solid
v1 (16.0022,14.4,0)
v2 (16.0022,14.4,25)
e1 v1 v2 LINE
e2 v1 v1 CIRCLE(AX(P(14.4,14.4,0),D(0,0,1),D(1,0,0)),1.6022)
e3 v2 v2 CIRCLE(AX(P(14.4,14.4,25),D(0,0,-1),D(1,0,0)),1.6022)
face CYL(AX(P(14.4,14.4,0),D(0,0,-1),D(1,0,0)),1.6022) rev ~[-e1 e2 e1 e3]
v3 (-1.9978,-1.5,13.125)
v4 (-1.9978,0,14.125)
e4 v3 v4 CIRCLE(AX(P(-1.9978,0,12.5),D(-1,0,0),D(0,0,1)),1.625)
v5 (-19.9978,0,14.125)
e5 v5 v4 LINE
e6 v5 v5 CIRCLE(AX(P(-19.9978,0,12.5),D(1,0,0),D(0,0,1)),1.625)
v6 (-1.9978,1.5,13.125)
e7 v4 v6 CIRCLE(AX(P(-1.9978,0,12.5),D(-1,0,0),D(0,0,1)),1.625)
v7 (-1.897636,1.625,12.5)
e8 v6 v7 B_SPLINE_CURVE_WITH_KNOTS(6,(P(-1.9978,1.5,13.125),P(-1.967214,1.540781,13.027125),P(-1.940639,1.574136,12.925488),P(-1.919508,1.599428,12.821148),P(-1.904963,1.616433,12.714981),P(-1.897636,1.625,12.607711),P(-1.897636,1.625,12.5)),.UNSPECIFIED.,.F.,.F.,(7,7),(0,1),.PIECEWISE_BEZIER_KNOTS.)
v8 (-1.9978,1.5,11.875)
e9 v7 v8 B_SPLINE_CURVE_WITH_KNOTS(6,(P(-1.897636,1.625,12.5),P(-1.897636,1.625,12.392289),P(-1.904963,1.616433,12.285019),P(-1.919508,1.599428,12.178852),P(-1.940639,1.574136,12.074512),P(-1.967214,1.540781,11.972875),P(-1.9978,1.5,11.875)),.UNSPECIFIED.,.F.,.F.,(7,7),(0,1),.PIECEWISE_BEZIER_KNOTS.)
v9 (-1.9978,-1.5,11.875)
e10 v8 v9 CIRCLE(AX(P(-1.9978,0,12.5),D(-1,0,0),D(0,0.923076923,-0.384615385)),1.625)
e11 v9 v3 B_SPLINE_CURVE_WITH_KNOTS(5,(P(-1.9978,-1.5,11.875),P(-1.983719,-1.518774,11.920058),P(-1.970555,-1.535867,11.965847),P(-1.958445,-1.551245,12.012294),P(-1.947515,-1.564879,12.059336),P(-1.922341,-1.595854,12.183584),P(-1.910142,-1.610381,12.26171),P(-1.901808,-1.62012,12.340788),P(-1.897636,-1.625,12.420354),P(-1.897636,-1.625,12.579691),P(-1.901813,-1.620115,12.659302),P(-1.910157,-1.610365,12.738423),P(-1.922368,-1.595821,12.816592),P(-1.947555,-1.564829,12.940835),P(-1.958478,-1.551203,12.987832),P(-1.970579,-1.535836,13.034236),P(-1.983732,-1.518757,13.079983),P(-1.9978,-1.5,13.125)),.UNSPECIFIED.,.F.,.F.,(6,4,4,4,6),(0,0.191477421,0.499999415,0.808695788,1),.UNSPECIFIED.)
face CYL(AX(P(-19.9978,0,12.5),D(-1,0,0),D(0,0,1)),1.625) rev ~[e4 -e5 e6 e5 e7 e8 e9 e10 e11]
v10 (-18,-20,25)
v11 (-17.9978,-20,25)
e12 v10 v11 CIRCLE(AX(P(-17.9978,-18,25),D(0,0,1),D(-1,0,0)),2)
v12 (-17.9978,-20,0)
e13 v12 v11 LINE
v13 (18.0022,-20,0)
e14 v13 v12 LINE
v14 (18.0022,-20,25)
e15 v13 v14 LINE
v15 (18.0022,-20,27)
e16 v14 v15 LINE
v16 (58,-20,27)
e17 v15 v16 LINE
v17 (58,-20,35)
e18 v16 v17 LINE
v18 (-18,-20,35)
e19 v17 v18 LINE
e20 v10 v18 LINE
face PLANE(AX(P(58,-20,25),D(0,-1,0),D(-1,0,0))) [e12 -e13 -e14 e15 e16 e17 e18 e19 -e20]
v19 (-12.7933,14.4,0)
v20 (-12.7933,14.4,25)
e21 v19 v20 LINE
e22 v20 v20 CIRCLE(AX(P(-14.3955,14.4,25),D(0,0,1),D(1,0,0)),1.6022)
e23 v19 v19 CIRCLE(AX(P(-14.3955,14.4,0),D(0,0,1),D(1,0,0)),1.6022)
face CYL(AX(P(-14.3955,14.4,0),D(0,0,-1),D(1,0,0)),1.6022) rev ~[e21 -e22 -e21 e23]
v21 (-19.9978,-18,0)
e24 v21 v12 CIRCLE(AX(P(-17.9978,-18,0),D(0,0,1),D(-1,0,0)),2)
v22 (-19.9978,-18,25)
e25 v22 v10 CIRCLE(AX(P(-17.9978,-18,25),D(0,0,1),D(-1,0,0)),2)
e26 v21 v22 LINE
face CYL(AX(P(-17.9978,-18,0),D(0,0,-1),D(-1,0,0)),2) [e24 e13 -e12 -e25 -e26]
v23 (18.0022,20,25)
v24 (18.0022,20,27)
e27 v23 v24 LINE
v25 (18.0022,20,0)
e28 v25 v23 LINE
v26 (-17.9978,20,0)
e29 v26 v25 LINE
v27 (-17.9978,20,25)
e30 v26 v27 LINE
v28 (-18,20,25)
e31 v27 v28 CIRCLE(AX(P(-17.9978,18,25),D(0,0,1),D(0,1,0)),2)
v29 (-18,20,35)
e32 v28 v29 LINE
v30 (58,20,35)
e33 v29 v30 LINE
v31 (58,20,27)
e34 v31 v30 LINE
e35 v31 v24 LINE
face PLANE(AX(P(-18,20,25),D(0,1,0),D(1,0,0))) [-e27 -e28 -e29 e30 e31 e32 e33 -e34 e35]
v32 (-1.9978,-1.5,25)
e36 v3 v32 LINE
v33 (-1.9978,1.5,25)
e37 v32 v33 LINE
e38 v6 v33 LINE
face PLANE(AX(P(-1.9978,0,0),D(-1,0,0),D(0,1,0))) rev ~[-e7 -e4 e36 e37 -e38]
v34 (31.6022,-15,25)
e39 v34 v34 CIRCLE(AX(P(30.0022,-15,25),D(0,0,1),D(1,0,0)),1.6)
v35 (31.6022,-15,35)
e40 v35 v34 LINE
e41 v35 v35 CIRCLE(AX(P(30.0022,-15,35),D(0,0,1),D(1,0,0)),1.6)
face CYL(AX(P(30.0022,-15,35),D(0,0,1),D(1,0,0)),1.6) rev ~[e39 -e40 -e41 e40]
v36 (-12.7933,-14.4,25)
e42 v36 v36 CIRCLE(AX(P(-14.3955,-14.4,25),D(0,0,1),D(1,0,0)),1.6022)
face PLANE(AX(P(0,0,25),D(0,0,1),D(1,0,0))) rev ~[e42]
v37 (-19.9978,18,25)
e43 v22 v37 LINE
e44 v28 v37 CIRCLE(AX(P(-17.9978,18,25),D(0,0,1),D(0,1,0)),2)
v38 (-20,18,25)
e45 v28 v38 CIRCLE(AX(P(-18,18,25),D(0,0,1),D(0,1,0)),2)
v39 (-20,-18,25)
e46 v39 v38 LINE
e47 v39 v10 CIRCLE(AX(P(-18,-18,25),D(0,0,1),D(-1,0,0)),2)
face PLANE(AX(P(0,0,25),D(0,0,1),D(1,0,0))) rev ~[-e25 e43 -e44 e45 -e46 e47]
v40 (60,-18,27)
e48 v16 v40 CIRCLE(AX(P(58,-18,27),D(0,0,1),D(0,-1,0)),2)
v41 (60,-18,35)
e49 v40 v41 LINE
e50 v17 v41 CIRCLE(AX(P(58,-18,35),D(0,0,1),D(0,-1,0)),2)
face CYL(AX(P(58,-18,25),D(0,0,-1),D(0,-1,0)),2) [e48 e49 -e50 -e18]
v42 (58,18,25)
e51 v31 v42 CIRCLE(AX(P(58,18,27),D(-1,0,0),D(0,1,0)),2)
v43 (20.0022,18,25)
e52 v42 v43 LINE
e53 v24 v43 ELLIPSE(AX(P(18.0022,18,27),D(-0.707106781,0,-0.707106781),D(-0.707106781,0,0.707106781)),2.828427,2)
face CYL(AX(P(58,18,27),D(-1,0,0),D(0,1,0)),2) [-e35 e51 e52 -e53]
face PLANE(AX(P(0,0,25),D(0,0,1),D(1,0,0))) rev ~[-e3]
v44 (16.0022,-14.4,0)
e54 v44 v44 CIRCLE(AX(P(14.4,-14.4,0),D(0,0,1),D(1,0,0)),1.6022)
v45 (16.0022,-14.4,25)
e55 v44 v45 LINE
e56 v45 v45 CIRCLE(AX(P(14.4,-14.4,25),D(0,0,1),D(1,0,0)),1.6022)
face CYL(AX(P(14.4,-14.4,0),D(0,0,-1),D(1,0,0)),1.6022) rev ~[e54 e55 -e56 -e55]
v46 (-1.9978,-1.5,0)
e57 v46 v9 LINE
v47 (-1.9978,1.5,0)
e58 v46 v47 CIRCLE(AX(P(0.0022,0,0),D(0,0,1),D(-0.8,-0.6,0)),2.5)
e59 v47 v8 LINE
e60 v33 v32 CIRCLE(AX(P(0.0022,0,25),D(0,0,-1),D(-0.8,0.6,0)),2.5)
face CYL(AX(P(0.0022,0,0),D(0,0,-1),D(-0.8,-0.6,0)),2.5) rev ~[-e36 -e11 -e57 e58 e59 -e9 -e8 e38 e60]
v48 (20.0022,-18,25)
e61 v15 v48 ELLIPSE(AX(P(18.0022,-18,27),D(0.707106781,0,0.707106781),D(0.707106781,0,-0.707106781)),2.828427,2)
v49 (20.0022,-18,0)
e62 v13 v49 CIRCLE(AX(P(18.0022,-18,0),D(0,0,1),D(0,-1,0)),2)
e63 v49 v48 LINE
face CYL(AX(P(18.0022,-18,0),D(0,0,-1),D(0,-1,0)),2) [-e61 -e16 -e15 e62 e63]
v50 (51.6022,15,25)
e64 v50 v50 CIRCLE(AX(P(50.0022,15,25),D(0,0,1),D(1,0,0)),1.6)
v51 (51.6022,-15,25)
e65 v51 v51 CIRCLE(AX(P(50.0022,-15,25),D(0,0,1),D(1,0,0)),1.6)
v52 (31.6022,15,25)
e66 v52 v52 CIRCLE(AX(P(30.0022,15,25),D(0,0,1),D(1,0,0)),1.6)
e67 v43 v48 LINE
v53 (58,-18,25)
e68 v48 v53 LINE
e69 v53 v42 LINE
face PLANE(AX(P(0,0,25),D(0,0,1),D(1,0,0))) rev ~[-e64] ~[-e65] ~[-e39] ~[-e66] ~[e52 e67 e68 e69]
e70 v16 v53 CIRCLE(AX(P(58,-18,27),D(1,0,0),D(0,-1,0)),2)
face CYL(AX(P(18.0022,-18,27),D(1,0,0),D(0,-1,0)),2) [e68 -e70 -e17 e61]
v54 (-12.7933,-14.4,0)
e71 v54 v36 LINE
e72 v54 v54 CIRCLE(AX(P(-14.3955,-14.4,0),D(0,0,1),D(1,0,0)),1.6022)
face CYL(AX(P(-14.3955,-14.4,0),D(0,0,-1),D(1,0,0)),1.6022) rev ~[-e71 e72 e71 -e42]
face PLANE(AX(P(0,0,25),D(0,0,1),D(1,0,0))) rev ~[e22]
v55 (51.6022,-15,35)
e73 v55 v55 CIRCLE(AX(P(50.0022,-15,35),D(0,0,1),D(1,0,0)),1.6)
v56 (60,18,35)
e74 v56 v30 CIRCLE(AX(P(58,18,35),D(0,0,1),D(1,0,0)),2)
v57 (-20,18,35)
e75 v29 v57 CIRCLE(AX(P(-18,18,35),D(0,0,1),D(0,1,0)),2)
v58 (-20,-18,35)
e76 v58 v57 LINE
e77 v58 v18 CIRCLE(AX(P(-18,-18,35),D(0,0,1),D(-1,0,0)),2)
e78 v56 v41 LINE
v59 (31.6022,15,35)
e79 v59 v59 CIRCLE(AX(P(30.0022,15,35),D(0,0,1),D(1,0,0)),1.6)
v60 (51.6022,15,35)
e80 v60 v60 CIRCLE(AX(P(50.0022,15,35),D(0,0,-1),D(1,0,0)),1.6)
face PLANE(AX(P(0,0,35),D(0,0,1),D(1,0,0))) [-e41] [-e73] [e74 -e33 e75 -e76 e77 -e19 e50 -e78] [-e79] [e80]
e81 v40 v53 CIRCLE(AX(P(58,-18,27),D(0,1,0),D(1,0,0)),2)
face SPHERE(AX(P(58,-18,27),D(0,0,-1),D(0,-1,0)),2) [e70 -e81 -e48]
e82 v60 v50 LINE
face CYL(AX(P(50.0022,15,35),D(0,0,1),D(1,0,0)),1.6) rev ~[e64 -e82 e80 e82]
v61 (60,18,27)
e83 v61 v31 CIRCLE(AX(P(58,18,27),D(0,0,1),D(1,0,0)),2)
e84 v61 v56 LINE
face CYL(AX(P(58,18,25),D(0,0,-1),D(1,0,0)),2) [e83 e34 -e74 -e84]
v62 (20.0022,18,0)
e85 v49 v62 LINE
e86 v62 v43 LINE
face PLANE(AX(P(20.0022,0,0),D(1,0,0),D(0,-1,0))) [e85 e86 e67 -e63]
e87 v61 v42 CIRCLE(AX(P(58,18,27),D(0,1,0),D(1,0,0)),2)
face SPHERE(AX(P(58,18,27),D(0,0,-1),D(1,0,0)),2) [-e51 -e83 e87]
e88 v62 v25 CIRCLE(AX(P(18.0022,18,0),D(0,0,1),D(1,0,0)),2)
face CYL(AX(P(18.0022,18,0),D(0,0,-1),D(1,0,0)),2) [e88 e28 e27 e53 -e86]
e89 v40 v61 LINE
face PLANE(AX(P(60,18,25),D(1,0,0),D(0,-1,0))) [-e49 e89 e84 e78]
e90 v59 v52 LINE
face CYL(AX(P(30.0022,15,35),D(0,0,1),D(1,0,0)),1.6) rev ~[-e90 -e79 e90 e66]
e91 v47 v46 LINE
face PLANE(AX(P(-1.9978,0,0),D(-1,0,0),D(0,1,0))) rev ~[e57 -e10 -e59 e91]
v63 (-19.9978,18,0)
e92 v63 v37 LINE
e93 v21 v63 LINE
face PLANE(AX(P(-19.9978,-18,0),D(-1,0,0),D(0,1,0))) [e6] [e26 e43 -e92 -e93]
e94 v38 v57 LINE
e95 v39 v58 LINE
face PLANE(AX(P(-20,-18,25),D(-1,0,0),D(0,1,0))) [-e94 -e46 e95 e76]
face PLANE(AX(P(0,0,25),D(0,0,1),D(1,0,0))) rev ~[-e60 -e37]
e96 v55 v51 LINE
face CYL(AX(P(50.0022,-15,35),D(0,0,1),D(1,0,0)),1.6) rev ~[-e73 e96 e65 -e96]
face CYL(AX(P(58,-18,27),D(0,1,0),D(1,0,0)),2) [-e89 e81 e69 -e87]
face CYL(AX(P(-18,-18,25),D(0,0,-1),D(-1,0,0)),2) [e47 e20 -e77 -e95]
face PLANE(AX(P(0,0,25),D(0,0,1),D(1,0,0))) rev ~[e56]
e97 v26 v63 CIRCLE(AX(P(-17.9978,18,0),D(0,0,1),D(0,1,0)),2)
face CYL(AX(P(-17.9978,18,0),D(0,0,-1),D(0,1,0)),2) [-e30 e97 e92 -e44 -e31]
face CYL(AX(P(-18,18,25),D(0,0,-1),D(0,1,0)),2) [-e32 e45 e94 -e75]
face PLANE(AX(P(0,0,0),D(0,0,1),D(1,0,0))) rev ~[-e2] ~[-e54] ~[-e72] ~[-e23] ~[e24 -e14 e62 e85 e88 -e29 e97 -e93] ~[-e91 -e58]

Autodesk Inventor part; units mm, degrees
ref_plane "YZ Plane" through (0, 0, 0) normal (1, 0, 0) x (0, 1, 0)
ref_plane "XZ Plane" through (0, 0, 0) normal (0, 1, 0) x (-1, 0, 0)
ref_plane "XY Plane" through (0, 0, 0) normal (0, 0, 1) x (1, 0, 0)
sketch "Sketch1" plane through (0, 0, 0) normal (0, 0, 1) x (1, 0, 0)
  arc A0 (-1.9978, -1.5) -> (-1.9978, 1.5) centre (0.0022, 0) ccw
  line L0 (2.5022, 0) -> (-1.9978, 0)
  line L1 (-1.9978, 0) -> (-1.9978, 1.5)
  line L2 (-1.9978, 0) -> (-1.9978, -1.5)
  line L3 (0.0022, 0) -> (20.0022, 0)
  line L4 (0.0022, 0) -> (0.0022, -20)
  line L5 (18.0022, -20) -> (-17.9978, -20)
  line L6 (-19.9978, -18) -> (-19.9978, 18)
  line L7 (-17.9978, 20) -> (18.0022, 20)
  line L8 (20.0022, 18) -> (20.0022, -18)
  line L9 (14.4, 14.4) -> (14.4, 20)
  line L10 (20.0022, 14.4) -> (16.0022, 14.4)
  circle A1 centre (14.4, 14.4) radius 1.6022
  circle A2 centre (14.4, -14.4) radius 1.6022
  circle A3 centre (-14.3955, 14.4) radius 1.6022
  circle A4 centre (-14.3955, -14.4) radius 1.6022
  arc A5 (-17.9978, 20) -> (-19.9978, 18) centre (-17.9978, 18) ccw
  arc A6 (20.0022, 18) -> (18.0022, 20) centre (18.0022, 18) ccw
  arc A7 (18.0022, -20) -> (20.0022, -18) centre (18.0022, -18) ccw
  arc A8 (-19.9978, -18) -> (-17.9978, -20) centre (-17.9978, -18) ccw
  point P0 (0, 0)
  point P1 (0.2522, 0)
  point P2 (-1.9978, 0.75)
  point P3 (-19.9978, 20)
  point P4 (-19.9978, -20)
  point P5 (20.0022, 20)
  dimension "d0" = 5
  dimension "d1" = 4.5
  dimension "d21" = 20
  dimension "d22" = 20
  dimension "d23" = 40
  dimension "d24" = 40
  dimension "d25" = 20
  dimension "d26" = 5.6
  dimension "d27" = 4
  dimension "d28" = 2
extrude "Extrusion1" add sketch "Sketch1" along normal blind 25 contours L3 L8 A7 L5 L4 A0 | A0 L1 L2 L4 L5 A8 L6 A5 L7 L9 A1 L10 L8 L3 | L10 A1 L9 L7 A6 L8
sketch "Sketch2" plane through (-19.9978, -18, 0) normal (-1, 0, 0) x (0, 0, 1)
  line L0 (0, 38) -> (25, 38) projected
  line L1 (0, 38) -> (12.5, 38)
  line L2 (12.5, 38) -> (12.5, 19.625)
  line L3 (12.5, 18) -> (0, 18)
  line L4 (0, 18) -> (0, 38)
  circle A0 centre (12.5, 18) radius 1.625
  dimension "d33" = 3.25
  dimension "d31" = 12.5
  dimension "d32" = 20
extrude "Extrusion2" cut sketch "Sketch2" against normal blind 20 contours A0
sketch "Sketch3" plane through (0, 0, 25) normal (0, 0, 1) x (1, 0, 0)
  line L0 (58, -20) -> (-18, -20)
  line L1 (-20, -18) -> (-20, 18)
  line L2 (-18, 20) -> (58, 20)
  line L3 (60, 18) -> (60, -18)
  arc A0 (58, -20) -> (60, -18) centre (58, -18) ccw
  arc A1 (60, 18) -> (58, 20) centre (58, 18) ccw
  arc A2 (-18, 20) -> (-20, 18) centre (-18, 18) ccw
  arc A3 (-20, -18) -> (-18, -20) centre (-18, -18) ccw
  point P0 (0, 0)
  dimension "d36" = 60
  dimension "d37" = 20
  dimension "d38" = 20
  dimension "d39" = 20
  dimension "d40" = 2
extrude "Extrusion3" add sketch "Sketch3" along normal blind 10
sketch "Sketch7" plane through (0, 0, 35) normal (0, 0, 1) x (1, 0, 0)
  line L0 (55.0022, 20) -> (50.0022, 20)
  line L1 (50.0022, 20) -> (50.0022, 15)
  line L2 (50.0022, 15) -> (55.0022, 15)
  line L3 (55.0022, 15) -> (55.0022, 20)
  circle A0 centre (50.0022, 15) radius 1.6
  line L4 (18.0022, 20) -> (-17.9978, 20) projected
  line L5 (0.0022, 20) -> (60.0022, 20)
  line L6 (60.0022, 20) -> (60.0022, -20)
  line L7 (60.0022, -20) -> (0.0022, -20)
  line L8 (0.0022, -20) -> (0.0022, 20)
  circle A1 centre (50.0022, -15) radius 1.6
  line L9 (60.0022, -20) -> (20.0022, -20)
  line L10 (20.0022, -20) -> (20.0022, 20)
  line L11 (20.0022, 20) -> (60.0022, 20)
  line L12 (60.0022, 20) -> (60.0022, -20)
  line L13 (58, 20) -> (-18, 20) projected
  line L14 (40.0022, 20) -> (40.0022, -20)
  circle A2 centre (30.0022, 15) radius 1.6
  circle A3 centre (30.0022, -15) radius 1.6
  point P0 (0, 0)
  dimension "d73" = 5
  dimension "d74" = 5
  dimension "d75" = 3.2
  dimension "d78" = 60
  dimension "d81" = 60
  dimension "d85" = 40
  dimension "d86" = 30
  dimension "d87" = 20
extrude "Extrusion6" cut sketch "Sketch7" against normal blind 20 contours A0 L2 L1 | L1 L2 A0 | A1 | A2 | A3
fillet "Fillet3" radius 2 5 edges at (59.4142, -19.4142, 25) (60, 0, 25) (59.4142, 19.4142, 25) (38.0011, 20, 25) (38.0011, -20, 25)
properties part number "afterdesign"
